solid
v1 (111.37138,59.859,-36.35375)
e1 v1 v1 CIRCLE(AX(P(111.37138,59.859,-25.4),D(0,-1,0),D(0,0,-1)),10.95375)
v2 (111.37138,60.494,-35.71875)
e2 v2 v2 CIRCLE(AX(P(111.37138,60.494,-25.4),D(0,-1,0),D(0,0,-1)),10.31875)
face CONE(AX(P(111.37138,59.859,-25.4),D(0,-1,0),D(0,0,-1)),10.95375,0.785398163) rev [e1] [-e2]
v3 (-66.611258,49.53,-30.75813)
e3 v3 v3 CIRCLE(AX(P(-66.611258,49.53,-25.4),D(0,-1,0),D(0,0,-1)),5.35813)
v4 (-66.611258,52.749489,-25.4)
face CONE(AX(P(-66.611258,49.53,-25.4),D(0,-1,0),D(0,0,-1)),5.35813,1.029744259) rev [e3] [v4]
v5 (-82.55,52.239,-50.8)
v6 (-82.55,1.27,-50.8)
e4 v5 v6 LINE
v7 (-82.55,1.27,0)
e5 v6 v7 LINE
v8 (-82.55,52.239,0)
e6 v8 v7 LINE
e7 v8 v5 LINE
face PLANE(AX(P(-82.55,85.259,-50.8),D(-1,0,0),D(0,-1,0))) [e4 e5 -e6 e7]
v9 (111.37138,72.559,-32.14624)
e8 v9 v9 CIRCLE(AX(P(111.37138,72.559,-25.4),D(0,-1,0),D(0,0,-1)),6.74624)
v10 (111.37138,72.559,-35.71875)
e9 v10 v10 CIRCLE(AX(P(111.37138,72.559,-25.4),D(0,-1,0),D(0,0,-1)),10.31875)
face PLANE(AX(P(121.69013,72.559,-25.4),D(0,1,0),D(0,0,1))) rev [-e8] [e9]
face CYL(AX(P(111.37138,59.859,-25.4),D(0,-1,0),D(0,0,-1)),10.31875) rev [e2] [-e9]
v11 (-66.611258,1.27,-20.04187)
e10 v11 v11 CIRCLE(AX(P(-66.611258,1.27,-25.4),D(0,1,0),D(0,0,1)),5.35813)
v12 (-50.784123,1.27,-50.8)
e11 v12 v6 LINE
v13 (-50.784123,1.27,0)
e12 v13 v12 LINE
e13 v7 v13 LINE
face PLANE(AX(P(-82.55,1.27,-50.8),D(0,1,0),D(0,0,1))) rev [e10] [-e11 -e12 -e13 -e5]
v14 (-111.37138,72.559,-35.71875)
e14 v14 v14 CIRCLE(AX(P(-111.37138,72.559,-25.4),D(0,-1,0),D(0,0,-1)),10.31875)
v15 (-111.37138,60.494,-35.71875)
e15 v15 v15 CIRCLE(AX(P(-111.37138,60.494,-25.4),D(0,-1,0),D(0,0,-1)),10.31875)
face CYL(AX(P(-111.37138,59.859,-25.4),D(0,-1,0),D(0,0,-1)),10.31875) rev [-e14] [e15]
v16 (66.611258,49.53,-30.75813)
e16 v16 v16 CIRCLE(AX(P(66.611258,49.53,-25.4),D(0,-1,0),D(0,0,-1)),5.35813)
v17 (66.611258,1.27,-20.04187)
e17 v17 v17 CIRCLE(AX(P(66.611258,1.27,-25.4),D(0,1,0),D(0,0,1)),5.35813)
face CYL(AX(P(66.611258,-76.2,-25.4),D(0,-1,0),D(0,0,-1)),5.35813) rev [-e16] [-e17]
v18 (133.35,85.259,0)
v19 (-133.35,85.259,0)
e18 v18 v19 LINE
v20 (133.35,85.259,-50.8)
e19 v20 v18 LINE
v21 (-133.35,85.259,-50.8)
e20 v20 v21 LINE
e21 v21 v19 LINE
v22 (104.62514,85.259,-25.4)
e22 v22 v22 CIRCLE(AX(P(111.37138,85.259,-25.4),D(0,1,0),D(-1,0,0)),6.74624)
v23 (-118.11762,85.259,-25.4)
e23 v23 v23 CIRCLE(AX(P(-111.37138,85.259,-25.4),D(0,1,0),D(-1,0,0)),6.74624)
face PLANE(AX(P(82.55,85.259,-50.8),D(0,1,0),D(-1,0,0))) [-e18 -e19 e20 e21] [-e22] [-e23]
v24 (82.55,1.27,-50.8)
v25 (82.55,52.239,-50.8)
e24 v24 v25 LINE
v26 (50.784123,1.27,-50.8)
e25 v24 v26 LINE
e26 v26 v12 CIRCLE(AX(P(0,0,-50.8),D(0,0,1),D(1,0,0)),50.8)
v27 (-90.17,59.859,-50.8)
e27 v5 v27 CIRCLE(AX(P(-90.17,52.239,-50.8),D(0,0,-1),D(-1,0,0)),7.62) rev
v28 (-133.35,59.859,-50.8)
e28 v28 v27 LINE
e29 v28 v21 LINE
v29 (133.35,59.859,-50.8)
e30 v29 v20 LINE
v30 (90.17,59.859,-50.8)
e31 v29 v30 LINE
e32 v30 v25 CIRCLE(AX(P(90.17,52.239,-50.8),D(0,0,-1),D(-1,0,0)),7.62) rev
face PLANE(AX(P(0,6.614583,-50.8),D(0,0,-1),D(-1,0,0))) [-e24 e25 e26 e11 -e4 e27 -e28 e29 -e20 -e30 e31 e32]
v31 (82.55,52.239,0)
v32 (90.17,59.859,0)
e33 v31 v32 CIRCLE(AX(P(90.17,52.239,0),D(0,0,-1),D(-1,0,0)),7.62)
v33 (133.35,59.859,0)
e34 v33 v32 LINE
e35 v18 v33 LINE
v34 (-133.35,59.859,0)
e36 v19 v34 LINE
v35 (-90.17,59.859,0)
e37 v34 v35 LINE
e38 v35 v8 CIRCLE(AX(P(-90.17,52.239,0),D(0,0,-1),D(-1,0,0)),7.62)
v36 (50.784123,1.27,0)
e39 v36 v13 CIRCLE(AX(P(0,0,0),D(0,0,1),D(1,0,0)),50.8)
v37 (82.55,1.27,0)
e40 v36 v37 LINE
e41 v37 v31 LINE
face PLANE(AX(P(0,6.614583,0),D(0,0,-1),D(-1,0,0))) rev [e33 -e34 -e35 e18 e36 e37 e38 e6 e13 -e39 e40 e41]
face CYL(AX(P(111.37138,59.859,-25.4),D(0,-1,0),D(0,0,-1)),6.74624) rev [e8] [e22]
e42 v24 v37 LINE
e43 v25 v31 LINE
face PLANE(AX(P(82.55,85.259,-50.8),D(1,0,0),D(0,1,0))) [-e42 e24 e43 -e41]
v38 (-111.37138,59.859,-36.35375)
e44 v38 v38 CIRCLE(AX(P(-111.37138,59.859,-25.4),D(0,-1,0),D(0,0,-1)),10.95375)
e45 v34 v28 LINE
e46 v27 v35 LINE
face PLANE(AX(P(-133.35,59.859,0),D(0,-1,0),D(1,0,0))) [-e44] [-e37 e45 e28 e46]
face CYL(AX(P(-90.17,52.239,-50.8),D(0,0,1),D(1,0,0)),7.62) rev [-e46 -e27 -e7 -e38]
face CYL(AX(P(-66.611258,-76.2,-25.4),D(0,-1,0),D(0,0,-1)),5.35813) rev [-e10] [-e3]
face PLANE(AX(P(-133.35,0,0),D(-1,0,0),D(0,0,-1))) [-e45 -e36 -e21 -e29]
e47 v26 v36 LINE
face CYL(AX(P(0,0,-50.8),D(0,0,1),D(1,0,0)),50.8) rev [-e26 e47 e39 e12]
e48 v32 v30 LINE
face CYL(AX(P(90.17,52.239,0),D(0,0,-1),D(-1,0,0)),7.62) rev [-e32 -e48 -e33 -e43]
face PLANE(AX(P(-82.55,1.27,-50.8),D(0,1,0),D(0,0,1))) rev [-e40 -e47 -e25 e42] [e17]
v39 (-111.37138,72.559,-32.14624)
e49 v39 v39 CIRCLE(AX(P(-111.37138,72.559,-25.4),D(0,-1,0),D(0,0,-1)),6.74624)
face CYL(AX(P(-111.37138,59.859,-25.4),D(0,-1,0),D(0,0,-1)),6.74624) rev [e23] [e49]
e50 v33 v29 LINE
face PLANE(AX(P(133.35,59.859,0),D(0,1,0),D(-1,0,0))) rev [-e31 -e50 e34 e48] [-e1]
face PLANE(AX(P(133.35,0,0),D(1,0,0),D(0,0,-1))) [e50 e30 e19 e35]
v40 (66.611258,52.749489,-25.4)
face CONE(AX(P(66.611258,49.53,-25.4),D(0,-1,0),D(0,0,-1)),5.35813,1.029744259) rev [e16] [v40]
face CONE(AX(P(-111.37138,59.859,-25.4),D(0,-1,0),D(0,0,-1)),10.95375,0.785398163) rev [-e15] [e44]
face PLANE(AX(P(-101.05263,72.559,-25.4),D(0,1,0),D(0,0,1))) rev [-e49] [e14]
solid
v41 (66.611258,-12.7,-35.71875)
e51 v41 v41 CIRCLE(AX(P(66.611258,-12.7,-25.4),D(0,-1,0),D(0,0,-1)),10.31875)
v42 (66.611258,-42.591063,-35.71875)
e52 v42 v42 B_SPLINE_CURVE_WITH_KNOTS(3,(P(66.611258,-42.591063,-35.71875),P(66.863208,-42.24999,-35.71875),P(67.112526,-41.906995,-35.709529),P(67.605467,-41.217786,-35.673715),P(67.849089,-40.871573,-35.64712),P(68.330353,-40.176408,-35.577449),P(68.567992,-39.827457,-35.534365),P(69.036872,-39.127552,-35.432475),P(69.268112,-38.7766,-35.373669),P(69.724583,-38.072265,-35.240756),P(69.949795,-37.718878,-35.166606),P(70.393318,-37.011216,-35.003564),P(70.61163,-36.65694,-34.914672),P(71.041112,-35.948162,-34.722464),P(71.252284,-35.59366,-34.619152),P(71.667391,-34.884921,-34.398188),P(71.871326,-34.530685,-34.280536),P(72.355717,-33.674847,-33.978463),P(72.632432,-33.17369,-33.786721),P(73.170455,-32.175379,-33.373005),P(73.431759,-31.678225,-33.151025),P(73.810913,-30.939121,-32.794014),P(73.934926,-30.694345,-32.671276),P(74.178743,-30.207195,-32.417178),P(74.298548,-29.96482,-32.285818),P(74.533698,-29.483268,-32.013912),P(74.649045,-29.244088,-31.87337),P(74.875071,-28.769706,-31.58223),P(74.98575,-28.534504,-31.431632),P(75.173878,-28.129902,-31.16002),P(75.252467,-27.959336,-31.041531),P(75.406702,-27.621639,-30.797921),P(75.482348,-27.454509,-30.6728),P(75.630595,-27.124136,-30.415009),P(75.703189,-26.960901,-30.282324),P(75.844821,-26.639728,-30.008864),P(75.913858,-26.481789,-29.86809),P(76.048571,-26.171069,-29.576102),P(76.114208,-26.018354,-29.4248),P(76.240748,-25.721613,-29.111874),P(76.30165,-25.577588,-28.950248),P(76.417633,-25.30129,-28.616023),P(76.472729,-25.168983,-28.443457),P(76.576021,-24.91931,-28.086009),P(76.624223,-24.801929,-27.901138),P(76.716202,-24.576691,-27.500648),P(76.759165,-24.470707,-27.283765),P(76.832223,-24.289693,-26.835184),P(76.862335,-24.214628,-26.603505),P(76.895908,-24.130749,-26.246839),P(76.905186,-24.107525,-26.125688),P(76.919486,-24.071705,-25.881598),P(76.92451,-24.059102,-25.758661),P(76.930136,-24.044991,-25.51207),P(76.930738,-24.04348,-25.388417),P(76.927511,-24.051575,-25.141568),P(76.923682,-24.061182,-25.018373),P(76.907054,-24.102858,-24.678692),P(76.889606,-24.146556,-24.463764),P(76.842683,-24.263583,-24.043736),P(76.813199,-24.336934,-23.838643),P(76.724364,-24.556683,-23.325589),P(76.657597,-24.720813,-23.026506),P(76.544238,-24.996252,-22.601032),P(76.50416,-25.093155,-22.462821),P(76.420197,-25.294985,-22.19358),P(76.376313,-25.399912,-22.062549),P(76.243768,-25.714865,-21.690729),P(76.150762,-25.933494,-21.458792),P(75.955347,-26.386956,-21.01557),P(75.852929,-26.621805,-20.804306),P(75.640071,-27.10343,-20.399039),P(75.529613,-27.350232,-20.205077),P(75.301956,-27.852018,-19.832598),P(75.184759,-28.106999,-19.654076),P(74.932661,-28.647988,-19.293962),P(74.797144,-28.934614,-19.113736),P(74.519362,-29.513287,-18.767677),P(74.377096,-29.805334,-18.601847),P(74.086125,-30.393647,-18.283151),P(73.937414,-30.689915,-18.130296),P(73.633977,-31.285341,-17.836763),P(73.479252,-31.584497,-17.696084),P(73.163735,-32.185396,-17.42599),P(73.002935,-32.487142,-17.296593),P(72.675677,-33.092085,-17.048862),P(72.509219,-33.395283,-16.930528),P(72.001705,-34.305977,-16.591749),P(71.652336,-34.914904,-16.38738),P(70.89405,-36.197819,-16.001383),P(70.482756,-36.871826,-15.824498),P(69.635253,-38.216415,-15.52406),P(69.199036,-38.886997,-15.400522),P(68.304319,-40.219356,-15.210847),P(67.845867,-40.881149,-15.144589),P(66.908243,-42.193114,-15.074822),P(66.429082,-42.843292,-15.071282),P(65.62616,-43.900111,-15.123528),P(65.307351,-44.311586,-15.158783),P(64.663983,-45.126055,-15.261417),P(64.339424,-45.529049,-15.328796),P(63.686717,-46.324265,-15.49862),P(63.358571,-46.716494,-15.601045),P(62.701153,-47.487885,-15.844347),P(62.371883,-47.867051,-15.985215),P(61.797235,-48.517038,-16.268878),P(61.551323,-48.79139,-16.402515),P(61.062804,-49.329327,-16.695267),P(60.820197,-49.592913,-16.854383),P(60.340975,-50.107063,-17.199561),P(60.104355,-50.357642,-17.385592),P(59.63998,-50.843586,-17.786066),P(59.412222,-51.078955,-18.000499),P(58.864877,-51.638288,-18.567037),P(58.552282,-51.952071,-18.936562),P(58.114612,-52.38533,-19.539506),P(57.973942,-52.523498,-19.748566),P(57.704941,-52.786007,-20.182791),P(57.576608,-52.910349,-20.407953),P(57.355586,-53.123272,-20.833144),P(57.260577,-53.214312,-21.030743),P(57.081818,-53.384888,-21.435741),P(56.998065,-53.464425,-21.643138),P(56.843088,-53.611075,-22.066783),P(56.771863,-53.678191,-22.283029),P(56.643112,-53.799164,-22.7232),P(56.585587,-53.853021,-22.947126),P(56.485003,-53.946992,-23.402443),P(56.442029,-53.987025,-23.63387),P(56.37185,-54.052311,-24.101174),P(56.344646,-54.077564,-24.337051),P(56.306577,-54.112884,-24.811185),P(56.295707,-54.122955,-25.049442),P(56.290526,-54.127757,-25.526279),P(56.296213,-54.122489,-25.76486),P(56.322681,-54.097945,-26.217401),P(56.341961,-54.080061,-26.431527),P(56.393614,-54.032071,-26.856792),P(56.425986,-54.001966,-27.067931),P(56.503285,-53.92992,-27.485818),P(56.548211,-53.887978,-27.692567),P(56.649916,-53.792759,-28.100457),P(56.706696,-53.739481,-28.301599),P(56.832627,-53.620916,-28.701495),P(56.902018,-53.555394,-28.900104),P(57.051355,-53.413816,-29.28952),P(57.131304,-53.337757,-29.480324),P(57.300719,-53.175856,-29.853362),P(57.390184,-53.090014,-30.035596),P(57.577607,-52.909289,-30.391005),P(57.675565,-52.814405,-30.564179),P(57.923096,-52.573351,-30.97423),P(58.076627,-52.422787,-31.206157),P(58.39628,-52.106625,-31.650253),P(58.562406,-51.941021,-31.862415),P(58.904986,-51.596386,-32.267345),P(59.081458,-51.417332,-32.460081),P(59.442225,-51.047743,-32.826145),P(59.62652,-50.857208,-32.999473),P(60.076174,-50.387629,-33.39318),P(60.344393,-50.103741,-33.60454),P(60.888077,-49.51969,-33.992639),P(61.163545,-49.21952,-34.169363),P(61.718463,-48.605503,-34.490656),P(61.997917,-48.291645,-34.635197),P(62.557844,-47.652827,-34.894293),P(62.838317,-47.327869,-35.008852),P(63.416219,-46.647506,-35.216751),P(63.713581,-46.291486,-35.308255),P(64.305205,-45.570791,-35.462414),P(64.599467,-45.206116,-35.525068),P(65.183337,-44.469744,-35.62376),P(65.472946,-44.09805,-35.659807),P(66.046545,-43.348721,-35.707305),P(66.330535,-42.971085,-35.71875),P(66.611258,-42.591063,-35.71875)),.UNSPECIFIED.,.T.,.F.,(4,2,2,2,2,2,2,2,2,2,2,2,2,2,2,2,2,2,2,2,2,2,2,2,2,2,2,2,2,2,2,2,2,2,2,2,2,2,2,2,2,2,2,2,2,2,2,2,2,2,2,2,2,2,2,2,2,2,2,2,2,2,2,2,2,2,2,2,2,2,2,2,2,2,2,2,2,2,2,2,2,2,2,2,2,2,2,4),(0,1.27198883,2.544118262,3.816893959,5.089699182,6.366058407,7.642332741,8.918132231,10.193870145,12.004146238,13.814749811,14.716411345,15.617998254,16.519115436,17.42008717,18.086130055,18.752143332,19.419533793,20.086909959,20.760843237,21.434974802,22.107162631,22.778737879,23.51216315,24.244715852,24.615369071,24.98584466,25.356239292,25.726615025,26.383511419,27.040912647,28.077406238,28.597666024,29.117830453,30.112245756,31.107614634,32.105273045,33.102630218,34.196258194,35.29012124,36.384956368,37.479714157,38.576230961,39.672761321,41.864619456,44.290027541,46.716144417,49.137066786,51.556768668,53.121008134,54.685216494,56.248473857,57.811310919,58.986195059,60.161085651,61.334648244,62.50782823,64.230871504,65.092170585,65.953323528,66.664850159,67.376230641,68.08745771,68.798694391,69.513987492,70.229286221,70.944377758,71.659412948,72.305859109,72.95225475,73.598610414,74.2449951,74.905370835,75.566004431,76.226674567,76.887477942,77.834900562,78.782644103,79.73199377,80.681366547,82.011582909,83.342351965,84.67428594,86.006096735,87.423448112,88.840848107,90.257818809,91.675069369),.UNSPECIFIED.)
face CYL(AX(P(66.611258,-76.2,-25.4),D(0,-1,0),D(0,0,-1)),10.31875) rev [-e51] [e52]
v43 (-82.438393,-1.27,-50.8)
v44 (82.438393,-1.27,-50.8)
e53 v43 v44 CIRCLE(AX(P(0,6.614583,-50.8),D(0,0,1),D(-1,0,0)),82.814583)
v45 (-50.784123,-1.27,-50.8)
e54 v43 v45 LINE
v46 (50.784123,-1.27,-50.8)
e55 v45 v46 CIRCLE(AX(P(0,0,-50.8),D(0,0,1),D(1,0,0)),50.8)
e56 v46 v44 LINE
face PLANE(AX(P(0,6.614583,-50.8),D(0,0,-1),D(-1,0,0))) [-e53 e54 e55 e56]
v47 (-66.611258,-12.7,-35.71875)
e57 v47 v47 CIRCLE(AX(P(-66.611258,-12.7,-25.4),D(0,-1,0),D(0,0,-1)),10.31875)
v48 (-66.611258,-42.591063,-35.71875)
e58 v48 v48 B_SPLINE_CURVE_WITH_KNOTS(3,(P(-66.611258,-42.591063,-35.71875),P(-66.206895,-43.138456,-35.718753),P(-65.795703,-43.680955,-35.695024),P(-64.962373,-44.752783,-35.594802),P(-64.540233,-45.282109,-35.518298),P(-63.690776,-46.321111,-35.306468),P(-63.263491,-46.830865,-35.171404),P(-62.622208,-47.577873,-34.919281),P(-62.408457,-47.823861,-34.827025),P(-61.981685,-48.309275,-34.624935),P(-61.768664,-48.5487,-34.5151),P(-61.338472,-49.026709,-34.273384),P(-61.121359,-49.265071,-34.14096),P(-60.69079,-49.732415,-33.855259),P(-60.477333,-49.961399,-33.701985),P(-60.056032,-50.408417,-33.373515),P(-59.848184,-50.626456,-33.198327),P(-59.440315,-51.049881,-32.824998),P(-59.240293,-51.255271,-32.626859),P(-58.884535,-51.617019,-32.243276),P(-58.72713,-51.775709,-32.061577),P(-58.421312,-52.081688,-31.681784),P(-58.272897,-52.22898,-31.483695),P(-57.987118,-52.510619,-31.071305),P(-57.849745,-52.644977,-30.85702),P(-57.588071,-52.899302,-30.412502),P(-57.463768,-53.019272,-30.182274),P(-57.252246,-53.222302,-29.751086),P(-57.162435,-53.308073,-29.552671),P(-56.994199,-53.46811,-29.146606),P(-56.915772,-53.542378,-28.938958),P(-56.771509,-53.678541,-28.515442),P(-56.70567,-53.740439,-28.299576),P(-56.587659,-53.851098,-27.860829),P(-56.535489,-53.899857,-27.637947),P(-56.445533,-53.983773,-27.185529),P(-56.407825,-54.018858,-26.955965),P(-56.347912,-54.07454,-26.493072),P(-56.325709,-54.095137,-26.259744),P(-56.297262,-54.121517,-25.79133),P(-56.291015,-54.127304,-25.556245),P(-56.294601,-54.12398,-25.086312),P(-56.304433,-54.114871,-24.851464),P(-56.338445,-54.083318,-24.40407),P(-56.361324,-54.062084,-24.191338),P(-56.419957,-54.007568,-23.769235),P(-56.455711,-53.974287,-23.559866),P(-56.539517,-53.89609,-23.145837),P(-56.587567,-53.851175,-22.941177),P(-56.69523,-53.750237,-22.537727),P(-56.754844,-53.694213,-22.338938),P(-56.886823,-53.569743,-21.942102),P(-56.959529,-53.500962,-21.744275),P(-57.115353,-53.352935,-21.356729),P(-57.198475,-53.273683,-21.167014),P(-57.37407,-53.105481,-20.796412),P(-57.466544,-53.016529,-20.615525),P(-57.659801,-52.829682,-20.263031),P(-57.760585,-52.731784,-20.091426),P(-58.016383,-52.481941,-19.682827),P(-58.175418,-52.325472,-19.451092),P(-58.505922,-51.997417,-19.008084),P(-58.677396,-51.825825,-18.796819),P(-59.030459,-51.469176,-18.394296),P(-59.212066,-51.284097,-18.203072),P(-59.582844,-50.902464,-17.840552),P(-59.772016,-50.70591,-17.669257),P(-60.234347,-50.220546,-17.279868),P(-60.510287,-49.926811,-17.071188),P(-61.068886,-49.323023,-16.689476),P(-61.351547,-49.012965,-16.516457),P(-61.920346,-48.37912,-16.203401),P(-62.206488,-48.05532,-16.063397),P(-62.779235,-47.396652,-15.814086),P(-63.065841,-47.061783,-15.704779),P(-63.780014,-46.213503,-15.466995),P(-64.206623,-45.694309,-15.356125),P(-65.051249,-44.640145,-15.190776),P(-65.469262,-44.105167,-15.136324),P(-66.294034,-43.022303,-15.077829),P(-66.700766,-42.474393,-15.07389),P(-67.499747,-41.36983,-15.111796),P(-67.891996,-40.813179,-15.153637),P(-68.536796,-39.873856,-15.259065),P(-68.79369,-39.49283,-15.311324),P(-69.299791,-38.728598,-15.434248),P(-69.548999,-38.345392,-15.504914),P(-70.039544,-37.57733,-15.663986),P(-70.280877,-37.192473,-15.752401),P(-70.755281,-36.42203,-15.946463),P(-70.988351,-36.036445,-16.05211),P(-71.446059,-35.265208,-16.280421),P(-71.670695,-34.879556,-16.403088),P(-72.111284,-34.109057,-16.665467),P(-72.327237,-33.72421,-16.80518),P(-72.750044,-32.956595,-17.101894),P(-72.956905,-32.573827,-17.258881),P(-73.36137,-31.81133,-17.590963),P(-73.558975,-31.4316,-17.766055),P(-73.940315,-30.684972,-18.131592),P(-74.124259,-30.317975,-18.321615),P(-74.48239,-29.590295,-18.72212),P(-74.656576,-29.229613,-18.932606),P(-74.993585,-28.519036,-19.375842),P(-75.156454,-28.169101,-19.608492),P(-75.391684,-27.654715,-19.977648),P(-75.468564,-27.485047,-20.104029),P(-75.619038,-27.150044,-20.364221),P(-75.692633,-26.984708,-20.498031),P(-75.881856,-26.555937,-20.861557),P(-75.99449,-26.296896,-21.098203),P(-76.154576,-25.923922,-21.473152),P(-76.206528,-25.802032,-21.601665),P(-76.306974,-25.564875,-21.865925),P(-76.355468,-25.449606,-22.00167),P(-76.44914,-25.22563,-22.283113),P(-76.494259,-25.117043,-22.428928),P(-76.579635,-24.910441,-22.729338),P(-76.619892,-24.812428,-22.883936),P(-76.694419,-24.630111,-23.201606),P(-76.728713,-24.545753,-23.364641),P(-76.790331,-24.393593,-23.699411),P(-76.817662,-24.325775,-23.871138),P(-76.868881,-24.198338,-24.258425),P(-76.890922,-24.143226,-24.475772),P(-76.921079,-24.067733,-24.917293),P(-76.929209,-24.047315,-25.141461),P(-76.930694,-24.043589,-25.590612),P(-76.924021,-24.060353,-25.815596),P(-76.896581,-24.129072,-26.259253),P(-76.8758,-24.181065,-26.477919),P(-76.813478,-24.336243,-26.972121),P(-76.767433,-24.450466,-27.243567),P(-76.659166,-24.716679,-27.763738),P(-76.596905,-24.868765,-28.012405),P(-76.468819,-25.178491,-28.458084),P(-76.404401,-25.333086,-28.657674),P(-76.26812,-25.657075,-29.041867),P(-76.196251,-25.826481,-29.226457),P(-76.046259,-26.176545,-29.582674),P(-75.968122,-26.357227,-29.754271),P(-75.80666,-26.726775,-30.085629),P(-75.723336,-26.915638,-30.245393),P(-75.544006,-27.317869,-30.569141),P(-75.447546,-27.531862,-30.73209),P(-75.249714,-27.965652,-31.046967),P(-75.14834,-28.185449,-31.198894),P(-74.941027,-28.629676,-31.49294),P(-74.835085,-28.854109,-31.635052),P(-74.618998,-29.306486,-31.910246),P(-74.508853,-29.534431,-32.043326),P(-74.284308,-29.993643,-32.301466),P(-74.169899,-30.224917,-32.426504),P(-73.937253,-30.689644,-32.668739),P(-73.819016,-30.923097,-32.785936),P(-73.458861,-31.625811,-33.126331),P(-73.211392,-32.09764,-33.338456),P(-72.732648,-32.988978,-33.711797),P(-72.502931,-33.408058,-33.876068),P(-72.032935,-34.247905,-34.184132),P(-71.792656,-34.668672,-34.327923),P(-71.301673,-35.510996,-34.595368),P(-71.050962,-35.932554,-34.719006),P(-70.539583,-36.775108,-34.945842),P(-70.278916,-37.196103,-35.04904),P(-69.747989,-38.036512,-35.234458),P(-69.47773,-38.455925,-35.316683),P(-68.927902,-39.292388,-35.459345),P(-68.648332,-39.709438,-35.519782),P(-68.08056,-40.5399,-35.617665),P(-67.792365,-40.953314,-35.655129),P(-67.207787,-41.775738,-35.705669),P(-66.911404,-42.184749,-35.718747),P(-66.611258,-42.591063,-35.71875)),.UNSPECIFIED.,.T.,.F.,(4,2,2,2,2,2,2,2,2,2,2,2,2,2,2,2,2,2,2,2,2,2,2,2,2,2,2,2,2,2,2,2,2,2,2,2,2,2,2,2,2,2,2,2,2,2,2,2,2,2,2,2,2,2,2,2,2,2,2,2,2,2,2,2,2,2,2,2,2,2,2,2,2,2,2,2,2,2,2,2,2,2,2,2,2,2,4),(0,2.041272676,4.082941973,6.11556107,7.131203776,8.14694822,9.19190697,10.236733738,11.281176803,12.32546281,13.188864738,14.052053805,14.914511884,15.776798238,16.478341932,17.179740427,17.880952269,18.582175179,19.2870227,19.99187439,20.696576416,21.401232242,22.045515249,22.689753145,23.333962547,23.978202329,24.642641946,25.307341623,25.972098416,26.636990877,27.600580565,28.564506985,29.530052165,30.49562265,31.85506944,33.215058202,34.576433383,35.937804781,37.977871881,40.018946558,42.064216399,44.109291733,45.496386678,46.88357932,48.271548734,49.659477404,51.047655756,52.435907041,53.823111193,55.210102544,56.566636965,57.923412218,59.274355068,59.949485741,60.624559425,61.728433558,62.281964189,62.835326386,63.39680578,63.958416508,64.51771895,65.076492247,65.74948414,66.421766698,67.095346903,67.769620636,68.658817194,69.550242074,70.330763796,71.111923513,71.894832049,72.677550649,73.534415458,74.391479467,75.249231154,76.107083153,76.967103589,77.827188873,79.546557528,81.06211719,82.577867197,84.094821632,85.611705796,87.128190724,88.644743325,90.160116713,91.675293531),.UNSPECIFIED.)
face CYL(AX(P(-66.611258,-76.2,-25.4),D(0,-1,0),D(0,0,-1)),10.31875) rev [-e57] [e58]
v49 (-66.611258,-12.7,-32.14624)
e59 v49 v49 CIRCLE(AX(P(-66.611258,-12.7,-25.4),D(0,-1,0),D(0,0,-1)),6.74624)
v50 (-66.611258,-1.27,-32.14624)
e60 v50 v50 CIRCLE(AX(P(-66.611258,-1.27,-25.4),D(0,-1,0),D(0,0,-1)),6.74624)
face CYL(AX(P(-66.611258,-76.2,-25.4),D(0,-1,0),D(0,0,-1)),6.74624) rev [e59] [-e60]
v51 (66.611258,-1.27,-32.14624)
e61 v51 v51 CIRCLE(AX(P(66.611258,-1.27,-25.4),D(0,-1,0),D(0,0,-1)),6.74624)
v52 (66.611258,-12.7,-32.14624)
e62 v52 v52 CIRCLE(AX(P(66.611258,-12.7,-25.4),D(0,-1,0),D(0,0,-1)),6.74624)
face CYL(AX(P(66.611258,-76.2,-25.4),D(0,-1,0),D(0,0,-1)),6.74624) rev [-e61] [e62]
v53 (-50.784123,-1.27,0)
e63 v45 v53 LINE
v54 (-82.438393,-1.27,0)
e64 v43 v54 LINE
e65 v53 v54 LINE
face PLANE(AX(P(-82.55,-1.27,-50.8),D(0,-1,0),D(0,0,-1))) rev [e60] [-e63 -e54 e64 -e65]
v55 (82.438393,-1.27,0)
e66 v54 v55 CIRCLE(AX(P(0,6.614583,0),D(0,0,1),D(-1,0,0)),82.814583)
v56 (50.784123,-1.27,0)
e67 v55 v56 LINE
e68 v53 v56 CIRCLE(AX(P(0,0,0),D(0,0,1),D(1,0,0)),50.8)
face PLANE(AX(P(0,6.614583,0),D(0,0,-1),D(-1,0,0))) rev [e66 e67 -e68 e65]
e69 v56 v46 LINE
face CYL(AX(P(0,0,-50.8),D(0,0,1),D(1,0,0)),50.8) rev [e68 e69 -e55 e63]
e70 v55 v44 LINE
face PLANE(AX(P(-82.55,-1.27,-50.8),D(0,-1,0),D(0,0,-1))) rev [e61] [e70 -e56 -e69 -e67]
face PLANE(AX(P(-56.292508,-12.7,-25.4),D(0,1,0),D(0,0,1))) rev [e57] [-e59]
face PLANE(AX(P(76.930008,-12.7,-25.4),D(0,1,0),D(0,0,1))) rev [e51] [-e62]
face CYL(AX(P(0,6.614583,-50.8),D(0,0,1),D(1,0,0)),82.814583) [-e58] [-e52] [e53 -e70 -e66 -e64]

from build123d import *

# Parameters (mm, degrees)
SKETCH1_R                 = 50.8
BOSS_EXTRUDE1_DEPTH       = 50.8
CUT_EXTRUDE1_DEPTH        = 130.090044469
CUT_EXTRUDE1_DEPTH_BACK   = 130.090044469
SKETCH2_W                 = 165.1
SKETCH2_H                 = 2.54
ADVANCEDHOLE1_START       = -54.125920427
ADVANCEDHOLE1_OUTLINE_R   = 10.31875
ADVANCEDHOLE1_DEPTH       = 41.425920427
ADVANCEDHOLE1_START_2     = -12.7
ADVANCEDHOLE1_2_OUTLINE_R = 6.74624
ADVANCEDHOLE1_2_DEPTH     = 11.43
SKETCH10_W                = 50.8
SKETCH10_H                = 25.4
BOSS_EXTRUDE2_DEPTH       = 50.8
FILLET1_R                 = 7.62


# Read off the part's stored shape, not the designer's step: AdvancedHole1
with BuildPart() as part:
    # Sketch1 → Boss-Extrude1 (new body)
    with BuildSketch(Plane.XY):
        with BuildLine():
            Line((82.55, 85.259), (-82.55, 85.259))
            Line((-82.55, 85.259), (-82.55, 0))
            ThreePointArc((-82.55, 0), (0, -76.2), (82.55, 0))
            Line((82.55, 0), (82.55, 85.259))
        make_face()
        Circle(SKETCH1_R, mode=Mode.SUBTRACT)
    extrude(amount=-BOSS_EXTRUDE1_DEPTH)

    # Sketch2 → Cut-Extrude1 (cut, two sides: drawn at the far end of the back side and taken through both)
    with BuildSketch(Plane.XY.offset(-CUT_EXTRUDE1_DEPTH_BACK)):
        Rectangle(SKETCH2_W, SKETCH2_H)
    extrude(amount=CUT_EXTRUDE1_DEPTH + CUT_EXTRUDE1_DEPTH_BACK, mode=Mode.SUBTRACT)


with BuildPart() as cut_extrude1_piece_1:
    # of the separate pieces the step leaves, piece 1, a body of its own (cut_extrude1_pieces)
    add(part.part.solids().sort_by_distance((82.55, 1.27, 0))[0])

    # AdvancedHole1 3 outline → AdvancedHole1 3 (revolve, cut)
    with BuildSketch(Plane(origin=(66.61125751, 0, -25.4), x_dir=(1, 0, 0), z_dir=(0, 0, 1))):
        Polygon((5.35813, 1.27), (5.35813, 49.53), (0, 52.749489309), (0, 1.27), align=None)
    revolve(axis=Axis((66.61125751, 0, -25.4), (0, 1, 0)), mode=Mode.SUBTRACT)

    # AdvancedHole1 4 outline → AdvancedHole1 4 (revolve, cut)
    with BuildSketch(Plane(origin=(-66.61125751, 0, -25.4), x_dir=(1, 0, 0), z_dir=(0, 0, 1))):
        Polygon((5.35813, 1.27), (5.35813, 49.53), (0, 52.749489309), (0, 1.27), align=None)
    revolve(axis=Axis((-66.61125751, 0, -25.4), (0, 1, 0)), mode=Mode.SUBTRACT)

    # Sketch10 → Boss-Extrude2 (add)
    with BuildSketch(Plane(origin=(82.55, 0, 0), x_dir=(0, 0, -1), z_dir=(1, 0, 0))):
        with Locations((25.4, 72.559)):
            Rectangle(SKETCH10_W, SKETCH10_H)
    boss_extrude2 = extrude(amount=BOSS_EXTRUDE2_DEPTH)

    # Sketch12 → CBORE for 1/2 Socket Head Cap Screw1 (revolve, cut)
    with BuildSketch(Plane(origin=(111.37138, 59.859, -25.4), x_dir=(0, 0, -1), z_dir=(1, 0, 0))):
        Polygon((0, 0), (0, 25.401), (6.74624, 25.401), (6.74624, 12.7), (10.31875, 12.7), (10.31875, 0.635), (10.95375, 0), align=None)
    cbore_for_1_2_socket_head_cap_screw1 = revolve(axis=Axis((111.37138, 53.509, -25.4), (0, 1, 0)), mode=Mode.SUBTRACT)

    # Mirror1: Boss-Extrude2, CBORE for 1/2 Socket Head Cap Screw1 across plane
    add(boss_extrude2.mirror(Plane(origin=(0, 0, 0), x_dir=(0, 0, 1), z_dir=(1, 0, 0))))
    add(cbore_for_1_2_socket_head_cap_screw1.mirror(Plane(origin=(0, 0, 0), x_dir=(0, 0, 1), z_dir=(1, 0, 0))), mode=Mode.SUBTRACT)

    # Fillet1
    fillet1_edges = [cut_extrude1_piece_1.edges().sort_by_distance(p)[0] for p in [
        (82.55, 59.859, -25.4),
        (-82.55, 59.859, -25.4),
    ]]
    fillet(fillet1_edges, radius=FILLET1_R)


with BuildPart() as cut_extrude1_piece_2:
    # of the separate pieces the step leaves, piece 2, a body of its own (cut_extrude1_pieces)
    add(part.part.solids().sort_by_distance((-82.438392502, -1.27, 0))[0])

    # AdvancedHole1 outline → AdvancedHole1 (cut)
    with BuildSketch(Plane(origin=(0, 0, 0), x_dir=(1, 0, 0), z_dir=(0, 1, 0)).offset(ADVANCEDHOLE1_START)):
        with Locations((66.61125751, 25.4)):
            Circle(ADVANCEDHOLE1_OUTLINE_R)
        with Locations((-66.61125751, 25.4)):
            Circle(ADVANCEDHOLE1_OUTLINE_R)
    extrude(amount=ADVANCEDHOLE1_DEPTH, mode=Mode.SUBTRACT)

    # AdvancedHole1 2 outline → AdvancedHole1 2 (cut)
    with BuildSketch(Plane(origin=(0, 0, 0), x_dir=(1, 0, 0), z_dir=(0, 1, 0)).offset(ADVANCEDHOLE1_START_2)):
        with Locations((66.61125751, 25.4)):
            Circle(ADVANCEDHOLE1_2_OUTLINE_R)
        with Locations((-66.61125751, 25.4)):
            Circle(ADVANCEDHOLE1_2_OUTLINE_R)
    extrude(amount=ADVANCEDHOLE1_2_DEPTH, mode=Mode.SUBTRACT)


solid = Compound([cut_extrude1_piece_1.part, cut_extrude1_piece_2.part])
